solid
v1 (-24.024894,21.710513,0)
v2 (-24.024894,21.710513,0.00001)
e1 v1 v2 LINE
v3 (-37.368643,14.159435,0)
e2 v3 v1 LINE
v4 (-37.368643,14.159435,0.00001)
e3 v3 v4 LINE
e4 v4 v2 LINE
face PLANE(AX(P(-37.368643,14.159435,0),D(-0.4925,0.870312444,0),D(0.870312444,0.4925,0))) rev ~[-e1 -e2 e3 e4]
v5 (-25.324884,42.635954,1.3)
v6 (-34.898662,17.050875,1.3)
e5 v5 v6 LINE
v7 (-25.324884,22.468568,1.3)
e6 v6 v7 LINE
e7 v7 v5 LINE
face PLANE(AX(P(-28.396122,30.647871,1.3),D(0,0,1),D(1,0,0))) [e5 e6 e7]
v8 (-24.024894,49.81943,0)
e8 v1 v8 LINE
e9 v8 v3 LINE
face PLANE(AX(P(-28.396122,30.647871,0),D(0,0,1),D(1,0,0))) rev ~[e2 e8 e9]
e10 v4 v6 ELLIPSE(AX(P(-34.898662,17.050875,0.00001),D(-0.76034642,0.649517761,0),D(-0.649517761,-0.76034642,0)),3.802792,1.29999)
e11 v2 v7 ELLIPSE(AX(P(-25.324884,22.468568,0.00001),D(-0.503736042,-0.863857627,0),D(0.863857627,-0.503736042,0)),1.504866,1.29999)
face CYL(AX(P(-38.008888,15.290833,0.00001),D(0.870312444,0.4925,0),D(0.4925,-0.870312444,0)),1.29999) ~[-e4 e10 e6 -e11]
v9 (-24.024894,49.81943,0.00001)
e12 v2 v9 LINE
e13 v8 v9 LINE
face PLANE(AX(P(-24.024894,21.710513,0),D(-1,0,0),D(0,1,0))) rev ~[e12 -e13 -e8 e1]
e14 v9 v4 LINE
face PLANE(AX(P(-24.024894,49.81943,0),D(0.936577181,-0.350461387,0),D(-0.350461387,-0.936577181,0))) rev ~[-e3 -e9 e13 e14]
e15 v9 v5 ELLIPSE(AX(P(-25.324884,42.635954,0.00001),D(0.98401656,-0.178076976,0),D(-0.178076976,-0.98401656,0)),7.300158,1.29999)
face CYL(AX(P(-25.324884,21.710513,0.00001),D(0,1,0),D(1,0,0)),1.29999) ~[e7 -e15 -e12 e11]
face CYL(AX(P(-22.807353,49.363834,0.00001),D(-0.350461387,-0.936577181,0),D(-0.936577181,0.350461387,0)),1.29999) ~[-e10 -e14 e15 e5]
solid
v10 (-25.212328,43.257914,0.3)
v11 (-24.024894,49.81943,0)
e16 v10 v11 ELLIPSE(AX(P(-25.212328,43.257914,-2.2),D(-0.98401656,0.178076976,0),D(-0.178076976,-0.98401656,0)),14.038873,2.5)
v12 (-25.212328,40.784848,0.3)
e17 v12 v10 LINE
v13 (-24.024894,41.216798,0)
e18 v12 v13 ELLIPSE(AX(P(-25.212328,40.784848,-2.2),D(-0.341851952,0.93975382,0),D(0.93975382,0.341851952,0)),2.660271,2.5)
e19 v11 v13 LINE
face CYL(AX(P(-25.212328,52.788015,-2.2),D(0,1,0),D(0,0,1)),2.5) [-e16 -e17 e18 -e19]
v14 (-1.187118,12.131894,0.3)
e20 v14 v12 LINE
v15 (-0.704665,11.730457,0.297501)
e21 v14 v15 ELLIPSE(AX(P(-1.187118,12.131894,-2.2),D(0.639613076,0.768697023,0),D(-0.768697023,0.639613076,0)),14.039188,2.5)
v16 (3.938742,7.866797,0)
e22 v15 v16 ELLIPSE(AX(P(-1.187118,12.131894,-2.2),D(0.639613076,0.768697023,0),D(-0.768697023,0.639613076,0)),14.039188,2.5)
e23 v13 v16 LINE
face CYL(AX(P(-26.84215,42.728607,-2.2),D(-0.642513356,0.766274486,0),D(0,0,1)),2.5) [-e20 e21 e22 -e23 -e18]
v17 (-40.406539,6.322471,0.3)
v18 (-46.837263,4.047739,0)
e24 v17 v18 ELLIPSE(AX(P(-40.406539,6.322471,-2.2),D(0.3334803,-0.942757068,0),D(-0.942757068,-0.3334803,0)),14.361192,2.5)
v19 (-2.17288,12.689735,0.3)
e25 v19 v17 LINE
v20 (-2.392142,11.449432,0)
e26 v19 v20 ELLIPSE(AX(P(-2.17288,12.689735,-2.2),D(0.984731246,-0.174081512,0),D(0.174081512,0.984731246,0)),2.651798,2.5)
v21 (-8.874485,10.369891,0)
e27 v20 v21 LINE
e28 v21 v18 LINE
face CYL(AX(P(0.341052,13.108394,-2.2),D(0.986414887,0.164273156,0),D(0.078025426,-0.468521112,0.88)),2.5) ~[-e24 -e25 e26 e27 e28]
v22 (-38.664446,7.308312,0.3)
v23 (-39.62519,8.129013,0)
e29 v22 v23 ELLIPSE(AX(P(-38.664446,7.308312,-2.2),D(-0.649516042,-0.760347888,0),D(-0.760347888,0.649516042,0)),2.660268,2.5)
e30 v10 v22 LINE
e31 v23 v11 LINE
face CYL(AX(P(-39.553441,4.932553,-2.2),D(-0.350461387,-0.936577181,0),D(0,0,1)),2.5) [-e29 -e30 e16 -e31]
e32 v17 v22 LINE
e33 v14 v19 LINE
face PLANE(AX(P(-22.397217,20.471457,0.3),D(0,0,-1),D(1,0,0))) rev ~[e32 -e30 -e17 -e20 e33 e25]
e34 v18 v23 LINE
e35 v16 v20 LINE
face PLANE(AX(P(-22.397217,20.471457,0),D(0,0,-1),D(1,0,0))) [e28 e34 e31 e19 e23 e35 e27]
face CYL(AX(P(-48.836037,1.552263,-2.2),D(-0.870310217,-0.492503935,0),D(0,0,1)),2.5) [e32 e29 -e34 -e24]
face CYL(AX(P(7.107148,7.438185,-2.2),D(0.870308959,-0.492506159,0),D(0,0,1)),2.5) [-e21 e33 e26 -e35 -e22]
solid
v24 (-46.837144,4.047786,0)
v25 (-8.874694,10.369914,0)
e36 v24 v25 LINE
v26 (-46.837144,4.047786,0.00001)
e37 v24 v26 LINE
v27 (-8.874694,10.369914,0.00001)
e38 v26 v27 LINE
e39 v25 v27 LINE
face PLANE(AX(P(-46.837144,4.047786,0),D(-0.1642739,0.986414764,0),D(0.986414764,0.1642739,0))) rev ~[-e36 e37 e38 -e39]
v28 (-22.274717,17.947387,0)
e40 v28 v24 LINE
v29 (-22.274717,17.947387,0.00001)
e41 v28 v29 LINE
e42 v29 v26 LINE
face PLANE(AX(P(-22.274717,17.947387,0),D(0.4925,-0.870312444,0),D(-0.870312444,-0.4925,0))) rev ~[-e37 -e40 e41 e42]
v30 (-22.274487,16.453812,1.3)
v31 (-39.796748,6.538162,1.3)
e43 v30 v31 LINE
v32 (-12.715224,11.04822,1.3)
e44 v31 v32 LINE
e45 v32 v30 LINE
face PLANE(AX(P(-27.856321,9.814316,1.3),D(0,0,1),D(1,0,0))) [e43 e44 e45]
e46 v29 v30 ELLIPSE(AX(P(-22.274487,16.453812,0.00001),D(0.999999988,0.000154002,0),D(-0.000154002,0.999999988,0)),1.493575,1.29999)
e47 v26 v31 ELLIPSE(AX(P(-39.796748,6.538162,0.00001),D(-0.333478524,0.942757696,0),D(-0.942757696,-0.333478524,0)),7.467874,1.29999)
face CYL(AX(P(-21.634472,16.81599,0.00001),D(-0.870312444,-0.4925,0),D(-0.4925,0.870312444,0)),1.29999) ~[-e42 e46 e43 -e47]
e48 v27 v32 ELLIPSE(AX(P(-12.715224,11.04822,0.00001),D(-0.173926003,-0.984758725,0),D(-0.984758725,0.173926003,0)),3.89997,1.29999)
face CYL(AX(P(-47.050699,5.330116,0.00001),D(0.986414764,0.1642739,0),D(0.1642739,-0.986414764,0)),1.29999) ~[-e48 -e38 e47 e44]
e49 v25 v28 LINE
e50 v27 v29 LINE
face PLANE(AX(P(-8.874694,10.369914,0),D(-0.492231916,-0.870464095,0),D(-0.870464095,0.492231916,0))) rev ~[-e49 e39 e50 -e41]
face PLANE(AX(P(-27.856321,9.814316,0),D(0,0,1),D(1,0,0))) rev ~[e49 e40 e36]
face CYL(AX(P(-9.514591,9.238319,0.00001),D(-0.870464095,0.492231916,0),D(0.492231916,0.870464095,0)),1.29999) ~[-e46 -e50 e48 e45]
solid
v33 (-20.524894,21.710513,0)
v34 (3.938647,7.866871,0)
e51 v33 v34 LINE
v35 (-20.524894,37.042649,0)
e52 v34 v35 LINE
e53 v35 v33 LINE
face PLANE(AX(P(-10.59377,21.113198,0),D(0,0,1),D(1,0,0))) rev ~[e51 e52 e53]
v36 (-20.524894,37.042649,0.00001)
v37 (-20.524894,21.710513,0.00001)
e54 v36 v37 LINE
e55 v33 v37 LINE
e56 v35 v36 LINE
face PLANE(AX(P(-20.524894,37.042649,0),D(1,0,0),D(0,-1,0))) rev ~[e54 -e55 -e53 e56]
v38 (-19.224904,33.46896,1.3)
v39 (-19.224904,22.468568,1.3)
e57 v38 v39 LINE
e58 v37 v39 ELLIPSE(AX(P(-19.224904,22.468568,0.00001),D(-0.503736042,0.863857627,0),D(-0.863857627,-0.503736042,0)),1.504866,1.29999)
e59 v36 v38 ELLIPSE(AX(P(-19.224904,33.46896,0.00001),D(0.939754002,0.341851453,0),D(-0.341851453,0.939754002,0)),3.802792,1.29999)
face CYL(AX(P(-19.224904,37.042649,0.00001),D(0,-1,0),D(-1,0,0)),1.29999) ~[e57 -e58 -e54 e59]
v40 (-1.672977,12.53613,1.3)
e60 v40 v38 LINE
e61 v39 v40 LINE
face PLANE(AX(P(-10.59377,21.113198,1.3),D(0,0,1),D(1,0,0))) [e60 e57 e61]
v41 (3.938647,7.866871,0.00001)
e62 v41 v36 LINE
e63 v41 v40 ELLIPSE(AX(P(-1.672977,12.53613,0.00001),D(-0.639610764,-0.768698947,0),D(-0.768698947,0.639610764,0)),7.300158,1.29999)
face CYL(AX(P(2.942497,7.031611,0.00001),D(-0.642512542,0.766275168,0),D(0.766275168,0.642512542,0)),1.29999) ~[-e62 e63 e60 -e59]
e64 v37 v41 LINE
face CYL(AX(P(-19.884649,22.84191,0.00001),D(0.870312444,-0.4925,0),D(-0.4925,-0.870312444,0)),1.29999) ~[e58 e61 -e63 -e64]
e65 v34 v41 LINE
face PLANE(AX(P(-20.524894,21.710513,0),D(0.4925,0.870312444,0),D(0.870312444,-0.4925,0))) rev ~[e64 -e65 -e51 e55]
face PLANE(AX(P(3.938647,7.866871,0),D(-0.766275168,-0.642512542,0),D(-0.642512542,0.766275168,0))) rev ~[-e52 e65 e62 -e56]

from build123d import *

# Parameters (mm, degrees)
F1_DEPTH     = 1.3
F2_R         = 1.29999
F2_2_R       = 1.29999
F2_3_R       = 1.29999
F4_DEPTH     = 0.3
F5_T4_DEPTH  = 14.2239553164
F5_T9_DEPTH  = 50.4507657891
F5_T14_DEPTH = 14.5398031116
F5_T19_DEPTH = 49.459435346
F5_T24_DEPTH = 13.2114658899
F5_T29_DEPTH = 50.9943998556
F5_T35_DEPTH = 14.2239553164
F5_T39_DEPTH = 50.4507657891
F5_T46_DEPTH = 14.5398031116
F5_T50_DEPTH = 49.459435346
F5_T57_DEPTH = 50.9943998556
F5_T61_DEPTH = 13.2114658899


# Not quite as in the source:
# - a fillet or chamfer that OpenCascade refuses, or shapes differently, is made with other operations: its cross-section is extruded or revolved along the edge and cut away or added
# - a fillet or chamfer is up to 0.001 mm smaller than in the source, because OpenCascade refuses the exact size


with BuildPart() as f1:
    # F0 (on Top) → F1 (new body)
    with BuildSketch(Plane.XY):
        Polygon((-24.0248936415, 49.8194298056), (-37.3686429682, 14.1594352904), (-24.0248936415, 21.7105125955), align=None)
    extrude(amount=F1_DEPTH)

    # F2 (radius 1.3 in the source; OpenCascade refuses exactly that, so slightly less here)
    f2_edges = [f1.edges().sort_by_distance(p)[0] for p in [
        (-30.696768, 31.989433, 1.3),
        (-30.696768, 17.934974, 1.3),
        (-24.024894, 35.764971, 1.3),
    ]]
    fillet(f2_edges, radius=F2_R)


with BuildPart() as f1b:
    # F0 (on Top) → F1, piece 2 (new body)
    with BuildSketch(Plane.XY):
        Polygon((-20.5248936415, 37.0426492555), (-20.5248936415, 21.7105125955), (3.9386467909, 7.8668708695), align=None)
    extrude(amount=F1_DEPTH)

    # F2#2 (radius 1.3 in the source; OpenCascade refuses exactly that, so slightly less here)
    f2_2_edges = [f1b.edges().sort_by_distance(p)[0] for p in [
        (-8.293123, 22.45476, 1.3),
        (-20.524894, 29.376581, 1.3),
        (-8.293123, 14.788692, 1.3),
    ]]
    fillet(f2_2_edges, radius=F2_2_R)


with BuildPart() as f1c:
    # F0 (on Top) → F1, piece 3 (new body)
    with BuildSketch(Plane.XY):
        Polygon((-22.2747167061, 17.947387251), (-46.8371441831, 4.0477864614), (-8.874694457, 10.3699137332), align=None)
    extrude(amount=F1_DEPTH)

    # F2#3 (radius 1.3 in the source; OpenCascade refuses exactly that, so slightly less here)
    f2_3_edges = [f1c.edges().sort_by_distance(p)[0] for p in [
        (-15.574706, 14.15865, 1.3),
        (-34.55593, 10.997587, 1.3),
        (-27.855919, 7.20885, 1.3),
    ]]
    fillet(f2_3_edges, radius=F2_3_R)


with BuildPart() as f4:
    # F3 (on face) → F4 (new body)
    with BuildSketch(Plane(origin=(0, 0, 0), x_dir=(1, 0, 0), z_dir=(0, 0, -1))):
        Polygon((-39.6251897876, -8.1290127133), (-24.0248936415, -49.8194298056), (-24.0248936415, -41.2167977375), (-20.5247644335, -37.0424725115), (3.9387424476, -7.8667970374), (-2.3921415244, -11.4494320516), (-8.8744852692, -10.3698913008), (-46.8372628093, -4.0477388538), align=None)
    extrude(amount=-F4_DEPTH)

    # F5: fillet of radius 2.5 on 6 edges, made by hand


with BuildPart() as f5_tool2:
    # F5_s3 → F5_t4 (new body)
    with BuildSketch(Plane(origin=(-36.3250135829, -20.5561324652, 0), x_dir=(0, 0, 1), z_dir=(0.8703102173, 0.4925039346, 0))):
        with BuildLine():
            ThreePointArc((0.3, -25.4028904918), (0.2238399287, -26.0152629275), (0, -26.5903247005))
            Line((0, -26.5903247005), (0.044, -26.6140733847))
            ThreePointArc((0.044, -26.6140733847), (0.15, -26.6403247005), (0.3, -26.6403247005))
            Line((0.3, -26.6403247005), (0.35, -26.5903247005))
            Line((0.35, -26.5903247005), (0.35, -25.4028904918))
            Line((0.35, -25.4028904918), (0.3, -25.4028904918))
        make_face()
    extrude(amount=F5_T4_DEPTH)

    split(bisect_by=Plane(origin=(-37.4265173045, 14.0047712254, 0), x_dir=(0, 0, 1), z_dir=(-0.9365771812, 0.3504613868, 0)), keep=Keep.TOP)


with BuildPart() as f4_1:
    add(f4.part)

    # F5_t1: cut F5_tool2
    add(f5_tool2.part, mode=Mode.SUBTRACT)


with BuildPart() as f5_tool7:
    # F5_s8 → F5_t9 (new body)
    with BuildSketch(Plane(origin=(-3.2390470819, -8.6560679722, 0), x_dir=(0, 0, 1), z_dir=(0.3504613868, 0.9365771812, 0))):
        with BuildLine():
            ThreePointArc((0.3, -38.7735194163), (0.2238399287, -39.385891852), (0, -39.960953625))
            Line((0, -39.960953625), (0.044, -39.9847023092))
            ThreePointArc((0.044, -39.9847023092), (0.15, -40.010953625), (0.3, -40.010953625))
            Line((0.3, -40.010953625), (0.35, -39.960953625))
            Line((0.35, -39.960953625), (0.35, -38.7735194163))
            Line((0.35, -38.7735194163), (0.3, -38.7735194163))
        make_face()
    extrude(amount=F5_T9_DEPTH)

    split(bisect_by=Plane(origin=(-13.095839537, 23.1418312694, 0), x_dir=(0, 0, 1), z_dir=(-0.4925039346, 0.8703102173, 0)), keep=Keep.TOP)


with BuildPart() as f4_2:
    add(f4_1.part)

    # F5_t6: cut F5_tool7
    add(f5_tool7.part, mode=Mode.SUBTRACT)


with BuildPart() as f5_tool12:
    # F5_s13 → F5_t14 (new body)
    with BuildSketch(Plane.XZ.offset(-52.7880153273)):
        with BuildLine():
            ThreePointArc((-25.2123278502, 0.3), (-24.5999554145, 0.2238399287), (-24.0248936415, 0))
            Line((-24.0248936415, 0), (-24.0011449573, 0.044))
            ThreePointArc((-24.0011449573, 0.044), (-23.9748936415, 0.15), (-23.9748936415, 0.3))
            Line((-23.9748936415, 0.3), (-24.0248936415, 0.35))
            Line((-24.0248936415, 0.35), (-25.2123278502, 0.35))
            Line((-25.2123278502, 0.35), (-25.2123278502, 0.3))
        make_face()
    extrude(amount=F5_T14_DEPTH)

    split(bisect_by=Plane(origin=(6.1858887221, 5.1868047221, 0), x_dir=(0, 0, 1), z_dir=(0.7662744858, 0.6425133558, 0)), keep=Keep.TOP)


with BuildPart() as f4_3:
    add(f4_2.part)

    # F5_t11: cut F5_tool12
    add(f5_tool12.part, mode=Mode.SUBTRACT)


with BuildPart() as f5_tool17:
    # F5_s18 → F5_t19 (new body)
    with BuildSketch(Plane(origin=(-32.1181382092, 38.3047443597, 0), x_dir=(0, 0, 1), z_dir=(0.6425133558, -0.7662744858, 0))):
        with BuildLine():
            ThreePointArc((0.3, -6.8852457991), (0.2238399287, -7.4976182348), (0, -8.0726800078))
            Line((0, -8.0726800078), (0.044, -8.0964286919))
            ThreePointArc((0.044, -8.0964286919), (0.15, -8.1226800078), (0.3, -8.1226800078))
            Line((0.3, -8.1226800078), (0.35, -8.0726800078))
            Line((0.35, -8.0726800078), (0.35, -6.8852457991))
            Line((0.35, -6.8852457991), (0.3, -6.8852457991))
        make_face()
    extrude(amount=F5_T19_DEPTH)

    split(bisect_by=Plane.YZ.offset(-24.0248936415), keep=Keep.TOP)


with BuildPart() as f4_4:
    add(f4_3.part)

    # F5_t16: cut F5_tool17
    add(f5_tool17.part, mode=Mode.SUBTRACT)


with BuildPart() as f5_tool22:
    # F5_s23 → F5_t24 (new body)
    with BuildSketch(Plane(origin=(2.194973472, -1.2421312491, 0), x_dir=(0, 0, 1), z_dir=(-0.8703089586, 0.492506159, 0))):
        with BuildLine():
            ThreePointArc((0.3, 9.9738330597), (0.2238399287, 9.361460624), (0, 8.786398851))
            Line((0, 8.786398851), (0.044, 8.7626501668))
            ThreePointArc((0.044, 8.7626501668), (0.15, 8.736398851), (0.3, 8.736398851))
            Line((0.3, 8.736398851), (0.35, 8.786398851))
            Line((0.35, 8.786398851), (0.35, 9.9738330597))
            Line((0.35, 9.9738330597), (0.3, 9.9738330597))
        make_face()
    extrude(amount=F5_T24_DEPTH)

    split(bisect_by=Plane(origin=(-1.9198365379, 11.5280876274, 0), x_dir=(0, 0, 1), z_dir=(0.1642731564, -0.9864148874, 0)), keep=Keep.TOP)


with BuildPart() as f4_5:
    add(f4_4.part)

    # F5_t21: cut F5_tool22
    add(f5_tool22.part, mode=Mode.SUBTRACT)


with BuildPart() as f5_tool27:
    # F5_s28 → F5_t29 (new body)
    with BuildSketch(Plane(origin=(2.4559519667, 0.4090033381, 0), x_dir=(0, 0, 1), z_dir=(-0.9864148874, -0.1642731564, 0))):
        with BuildLine():
            ThreePointArc((0, 11.6868548668), (0.2238399287, 12.2619166398), (0.3, 12.8742890755))
            Line((0.3, 12.8742890755), (0.35, 12.8742890755))
            Line((0.35, 12.8742890755), (0.35, 11.6868548668))
            Line((0.35, 11.6868548668), (0.3, 11.6368548668))
            ThreePointArc((0.3, 11.6368548668), (0.15, 11.6368548668), (0.044, 11.6631061826))
            Line((0.044, 11.6631061826), (0, 11.6868548668))
        make_face()
    extrude(amount=F5_T29_DEPTH)

    split(bisect_by=Plane(origin=(4.3273555495, 7.6468816335, 0), x_dir=(0, 0, 1), z_dir=(-0.492506159, -0.8703089586, 0)), keep=Keep.TOP)


with BuildPart() as f4_6:
    add(f4_5.part)

    # F5_t26: cut F5_tool27
    add(f5_tool27.part, mode=Mode.SUBTRACT)


with BuildPart() as f5_tool33:
    # F5_s34 → F5_t35 (new body)
    with BuildSketch(Plane(origin=(-36.3250135829, -20.5561324652, 0), x_dir=(0, 0, 1), z_dir=(0.8703102173, 0.4925039346, 0))):
        with BuildLine():
            ThreePointArc((0.3, -25.4028904918), (0.2238399287, -26.0152629275), (0, -26.5903247005))
            Line((0, -26.5903247005), (0.044, -26.6140733847))
            ThreePointArc((0.044, -26.6140733847), (0.15, -26.6403247005), (0.3, -26.6403247005))
            Line((0.3, -26.6403247005), (0.35, -26.5903247005))
            Line((0.35, -26.5903247005), (0.35, -25.4028904918))
            Line((0.35, -25.4028904918), (0.3, -25.4028904918))
        make_face()
    extrude(amount=F5_T35_DEPTH)

    split(bisect_by=Plane(origin=(-37.4265173045, 14.0047712254, 0), x_dir=(0, 0, 1), z_dir=(0.9365771812, -0.3504613868, 0)), keep=Keep.TOP)


with BuildPart() as f5_tool37:
    # F5_s38 → F5_t39 (new body)
    with BuildSketch(Plane(origin=(-3.2390470819, -8.6560679722, 0), x_dir=(0, 0, 1), z_dir=(0.3504613868, 0.9365771812, 0))):
        with BuildLine():
            ThreePointArc((0.3, -38.7735194163), (0.2238399287, -39.385891852), (0, -39.960953625))
            Line((0, -39.960953625), (0.044, -39.9847023092))
            ThreePointArc((0.044, -39.9847023092), (0.15, -40.010953625), (0.3, -40.010953625))
            Line((0.3, -40.010953625), (0.35, -39.960953625))
            Line((0.35, -39.960953625), (0.35, -38.7735194163))
            Line((0.35, -38.7735194163), (0.3, -38.7735194163))
        make_face()
    extrude(amount=F5_T39_DEPTH)

    split(bisect_by=Plane(origin=(-13.095839537, 23.1418312694, 0), x_dir=(0, 0, 1), z_dir=(0.4925039346, -0.8703102173, 0)), keep=Keep.TOP)


with BuildPart() as f5_tool33_1:
    add(f5_tool33.part)

    # F5_t41: intersect F5_tool37
    add(f5_tool37.part, mode=Mode.INTERSECT)


with BuildPart() as f4_7:
    add(f4_6.part)

    # F5_t31: cut F5_tool33
    add(f5_tool33_1.part, mode=Mode.SUBTRACT)


with BuildPart() as f5_tool44:
    # F5_s45 → F5_t46 (new body)
    with BuildSketch(Plane.XZ.offset(-52.7880153273)):
        with BuildLine():
            ThreePointArc((-25.2123278502, 0.3), (-24.5999554145, 0.2238399287), (-24.0248936415, 0))
            Line((-24.0248936415, 0), (-24.0011449573, 0.044))
            ThreePointArc((-24.0011449573, 0.044), (-23.9748936415, 0.15), (-23.9748936415, 0.3))
            Line((-23.9748936415, 0.3), (-24.0248936415, 0.35))
            Line((-24.0248936415, 0.35), (-25.2123278502, 0.35))
            Line((-25.2123278502, 0.35), (-25.2123278502, 0.3))
        make_face()
    extrude(amount=F5_T46_DEPTH)

    split(bisect_by=Plane(origin=(6.1858887221, 5.1868047221, 0), x_dir=(0, 0, 1), z_dir=(-0.7662744858, -0.6425133558, 0)), keep=Keep.TOP)


with BuildPart() as f5_tool48:
    # F5_s49 → F5_t50 (new body)
    with BuildSketch(Plane(origin=(-32.1181382092, 38.3047443597, 0), x_dir=(0, 0, 1), z_dir=(0.6425133558, -0.7662744858, 0))):
        with BuildLine():
            ThreePointArc((0.3, -6.8852457991), (0.2238399287, -7.4976182348), (0, -8.0726800078))
            Line((0, -8.0726800078), (0.044, -8.0964286919))
            ThreePointArc((0.044, -8.0964286919), (0.15, -8.1226800078), (0.3, -8.1226800078))
            Line((0.3, -8.1226800078), (0.35, -8.0726800078))
            Line((0.35, -8.0726800078), (0.35, -6.8852457991))
            Line((0.35, -6.8852457991), (0.3, -6.8852457991))
        make_face()
    extrude(amount=F5_T50_DEPTH)

    split(bisect_by=Plane.YZ.offset(-24.0248936415), keep=Keep.BOTTOM)


with BuildPart() as f5_tool44_1:
    add(f5_tool44.part)

    # F5_t52: intersect F5_tool48
    add(f5_tool48.part, mode=Mode.INTERSECT)


with BuildPart() as f4_8:
    add(f4_7.part)

    # F5_t42: cut F5_tool44
    add(f5_tool44_1.part, mode=Mode.SUBTRACT)


with BuildPart() as f5_tool55:
    # F5_s56 → F5_t57 (new body)
    with BuildSketch(Plane(origin=(2.4559519667, 0.4090033381, 0), x_dir=(0, 0, 1), z_dir=(-0.9864148874, -0.1642731564, 0))):
        with BuildLine():
            ThreePointArc((0, 11.6868548668), (0.2238399287, 12.2619166398), (0.3, 12.8742890755))
            Line((0.3, 12.8742890755), (0.35, 12.8742890755))
            Line((0.35, 12.8742890755), (0.35, 11.6868548668))
            Line((0.35, 11.6868548668), (0.3, 11.6368548668))
            ThreePointArc((0.3, 11.6368548668), (0.15, 11.6368548668), (0.044, 11.6631061826))
            Line((0.044, 11.6631061826), (0, 11.6868548668))
        make_face()
    extrude(amount=F5_T57_DEPTH)

    split(bisect_by=Plane(origin=(4.3273555495, 7.6468816335, 0), x_dir=(0, 0, 1), z_dir=(0.492506159, 0.8703089586, 0)), keep=Keep.TOP)


with BuildPart() as f5_tool59:
    # F5_s60 → F5_t61 (new body)
    with BuildSketch(Plane(origin=(2.194973472, -1.2421312491, 0), x_dir=(0, 0, 1), z_dir=(-0.8703089586, 0.492506159, 0))):
        with BuildLine():
            ThreePointArc((0.3, 9.9738330597), (0.2238399287, 9.361460624), (0, 8.786398851))
            Line((0, 8.786398851), (0.044, 8.7626501668))
            ThreePointArc((0.044, 8.7626501668), (0.15, 8.736398851), (0.3, 8.736398851))
            Line((0.3, 8.736398851), (0.35, 8.786398851))
            Line((0.35, 8.786398851), (0.35, 9.9738330597))
            Line((0.35, 9.9738330597), (0.3, 9.9738330597))
        make_face()
    extrude(amount=F5_T61_DEPTH)

    split(bisect_by=Plane(origin=(-1.9198365379, 11.5280876274, 0), x_dir=(0, 0, 1), z_dir=(-0.1642731564, 0.9864148874, 0)), keep=Keep.TOP)


with BuildPart() as f5_tool55_1:
    add(f5_tool55.part)

    # F5_t63: intersect F5_tool59
    add(f5_tool59.part, mode=Mode.INTERSECT)


with BuildPart() as f4_9:
    add(f4_8.part)

    # F5_t53: cut F5_tool55
    add(f5_tool55_1.part, mode=Mode.SUBTRACT)


solid = Compound([f1.part, f1b.part, f1c.part, f4_9.part])
